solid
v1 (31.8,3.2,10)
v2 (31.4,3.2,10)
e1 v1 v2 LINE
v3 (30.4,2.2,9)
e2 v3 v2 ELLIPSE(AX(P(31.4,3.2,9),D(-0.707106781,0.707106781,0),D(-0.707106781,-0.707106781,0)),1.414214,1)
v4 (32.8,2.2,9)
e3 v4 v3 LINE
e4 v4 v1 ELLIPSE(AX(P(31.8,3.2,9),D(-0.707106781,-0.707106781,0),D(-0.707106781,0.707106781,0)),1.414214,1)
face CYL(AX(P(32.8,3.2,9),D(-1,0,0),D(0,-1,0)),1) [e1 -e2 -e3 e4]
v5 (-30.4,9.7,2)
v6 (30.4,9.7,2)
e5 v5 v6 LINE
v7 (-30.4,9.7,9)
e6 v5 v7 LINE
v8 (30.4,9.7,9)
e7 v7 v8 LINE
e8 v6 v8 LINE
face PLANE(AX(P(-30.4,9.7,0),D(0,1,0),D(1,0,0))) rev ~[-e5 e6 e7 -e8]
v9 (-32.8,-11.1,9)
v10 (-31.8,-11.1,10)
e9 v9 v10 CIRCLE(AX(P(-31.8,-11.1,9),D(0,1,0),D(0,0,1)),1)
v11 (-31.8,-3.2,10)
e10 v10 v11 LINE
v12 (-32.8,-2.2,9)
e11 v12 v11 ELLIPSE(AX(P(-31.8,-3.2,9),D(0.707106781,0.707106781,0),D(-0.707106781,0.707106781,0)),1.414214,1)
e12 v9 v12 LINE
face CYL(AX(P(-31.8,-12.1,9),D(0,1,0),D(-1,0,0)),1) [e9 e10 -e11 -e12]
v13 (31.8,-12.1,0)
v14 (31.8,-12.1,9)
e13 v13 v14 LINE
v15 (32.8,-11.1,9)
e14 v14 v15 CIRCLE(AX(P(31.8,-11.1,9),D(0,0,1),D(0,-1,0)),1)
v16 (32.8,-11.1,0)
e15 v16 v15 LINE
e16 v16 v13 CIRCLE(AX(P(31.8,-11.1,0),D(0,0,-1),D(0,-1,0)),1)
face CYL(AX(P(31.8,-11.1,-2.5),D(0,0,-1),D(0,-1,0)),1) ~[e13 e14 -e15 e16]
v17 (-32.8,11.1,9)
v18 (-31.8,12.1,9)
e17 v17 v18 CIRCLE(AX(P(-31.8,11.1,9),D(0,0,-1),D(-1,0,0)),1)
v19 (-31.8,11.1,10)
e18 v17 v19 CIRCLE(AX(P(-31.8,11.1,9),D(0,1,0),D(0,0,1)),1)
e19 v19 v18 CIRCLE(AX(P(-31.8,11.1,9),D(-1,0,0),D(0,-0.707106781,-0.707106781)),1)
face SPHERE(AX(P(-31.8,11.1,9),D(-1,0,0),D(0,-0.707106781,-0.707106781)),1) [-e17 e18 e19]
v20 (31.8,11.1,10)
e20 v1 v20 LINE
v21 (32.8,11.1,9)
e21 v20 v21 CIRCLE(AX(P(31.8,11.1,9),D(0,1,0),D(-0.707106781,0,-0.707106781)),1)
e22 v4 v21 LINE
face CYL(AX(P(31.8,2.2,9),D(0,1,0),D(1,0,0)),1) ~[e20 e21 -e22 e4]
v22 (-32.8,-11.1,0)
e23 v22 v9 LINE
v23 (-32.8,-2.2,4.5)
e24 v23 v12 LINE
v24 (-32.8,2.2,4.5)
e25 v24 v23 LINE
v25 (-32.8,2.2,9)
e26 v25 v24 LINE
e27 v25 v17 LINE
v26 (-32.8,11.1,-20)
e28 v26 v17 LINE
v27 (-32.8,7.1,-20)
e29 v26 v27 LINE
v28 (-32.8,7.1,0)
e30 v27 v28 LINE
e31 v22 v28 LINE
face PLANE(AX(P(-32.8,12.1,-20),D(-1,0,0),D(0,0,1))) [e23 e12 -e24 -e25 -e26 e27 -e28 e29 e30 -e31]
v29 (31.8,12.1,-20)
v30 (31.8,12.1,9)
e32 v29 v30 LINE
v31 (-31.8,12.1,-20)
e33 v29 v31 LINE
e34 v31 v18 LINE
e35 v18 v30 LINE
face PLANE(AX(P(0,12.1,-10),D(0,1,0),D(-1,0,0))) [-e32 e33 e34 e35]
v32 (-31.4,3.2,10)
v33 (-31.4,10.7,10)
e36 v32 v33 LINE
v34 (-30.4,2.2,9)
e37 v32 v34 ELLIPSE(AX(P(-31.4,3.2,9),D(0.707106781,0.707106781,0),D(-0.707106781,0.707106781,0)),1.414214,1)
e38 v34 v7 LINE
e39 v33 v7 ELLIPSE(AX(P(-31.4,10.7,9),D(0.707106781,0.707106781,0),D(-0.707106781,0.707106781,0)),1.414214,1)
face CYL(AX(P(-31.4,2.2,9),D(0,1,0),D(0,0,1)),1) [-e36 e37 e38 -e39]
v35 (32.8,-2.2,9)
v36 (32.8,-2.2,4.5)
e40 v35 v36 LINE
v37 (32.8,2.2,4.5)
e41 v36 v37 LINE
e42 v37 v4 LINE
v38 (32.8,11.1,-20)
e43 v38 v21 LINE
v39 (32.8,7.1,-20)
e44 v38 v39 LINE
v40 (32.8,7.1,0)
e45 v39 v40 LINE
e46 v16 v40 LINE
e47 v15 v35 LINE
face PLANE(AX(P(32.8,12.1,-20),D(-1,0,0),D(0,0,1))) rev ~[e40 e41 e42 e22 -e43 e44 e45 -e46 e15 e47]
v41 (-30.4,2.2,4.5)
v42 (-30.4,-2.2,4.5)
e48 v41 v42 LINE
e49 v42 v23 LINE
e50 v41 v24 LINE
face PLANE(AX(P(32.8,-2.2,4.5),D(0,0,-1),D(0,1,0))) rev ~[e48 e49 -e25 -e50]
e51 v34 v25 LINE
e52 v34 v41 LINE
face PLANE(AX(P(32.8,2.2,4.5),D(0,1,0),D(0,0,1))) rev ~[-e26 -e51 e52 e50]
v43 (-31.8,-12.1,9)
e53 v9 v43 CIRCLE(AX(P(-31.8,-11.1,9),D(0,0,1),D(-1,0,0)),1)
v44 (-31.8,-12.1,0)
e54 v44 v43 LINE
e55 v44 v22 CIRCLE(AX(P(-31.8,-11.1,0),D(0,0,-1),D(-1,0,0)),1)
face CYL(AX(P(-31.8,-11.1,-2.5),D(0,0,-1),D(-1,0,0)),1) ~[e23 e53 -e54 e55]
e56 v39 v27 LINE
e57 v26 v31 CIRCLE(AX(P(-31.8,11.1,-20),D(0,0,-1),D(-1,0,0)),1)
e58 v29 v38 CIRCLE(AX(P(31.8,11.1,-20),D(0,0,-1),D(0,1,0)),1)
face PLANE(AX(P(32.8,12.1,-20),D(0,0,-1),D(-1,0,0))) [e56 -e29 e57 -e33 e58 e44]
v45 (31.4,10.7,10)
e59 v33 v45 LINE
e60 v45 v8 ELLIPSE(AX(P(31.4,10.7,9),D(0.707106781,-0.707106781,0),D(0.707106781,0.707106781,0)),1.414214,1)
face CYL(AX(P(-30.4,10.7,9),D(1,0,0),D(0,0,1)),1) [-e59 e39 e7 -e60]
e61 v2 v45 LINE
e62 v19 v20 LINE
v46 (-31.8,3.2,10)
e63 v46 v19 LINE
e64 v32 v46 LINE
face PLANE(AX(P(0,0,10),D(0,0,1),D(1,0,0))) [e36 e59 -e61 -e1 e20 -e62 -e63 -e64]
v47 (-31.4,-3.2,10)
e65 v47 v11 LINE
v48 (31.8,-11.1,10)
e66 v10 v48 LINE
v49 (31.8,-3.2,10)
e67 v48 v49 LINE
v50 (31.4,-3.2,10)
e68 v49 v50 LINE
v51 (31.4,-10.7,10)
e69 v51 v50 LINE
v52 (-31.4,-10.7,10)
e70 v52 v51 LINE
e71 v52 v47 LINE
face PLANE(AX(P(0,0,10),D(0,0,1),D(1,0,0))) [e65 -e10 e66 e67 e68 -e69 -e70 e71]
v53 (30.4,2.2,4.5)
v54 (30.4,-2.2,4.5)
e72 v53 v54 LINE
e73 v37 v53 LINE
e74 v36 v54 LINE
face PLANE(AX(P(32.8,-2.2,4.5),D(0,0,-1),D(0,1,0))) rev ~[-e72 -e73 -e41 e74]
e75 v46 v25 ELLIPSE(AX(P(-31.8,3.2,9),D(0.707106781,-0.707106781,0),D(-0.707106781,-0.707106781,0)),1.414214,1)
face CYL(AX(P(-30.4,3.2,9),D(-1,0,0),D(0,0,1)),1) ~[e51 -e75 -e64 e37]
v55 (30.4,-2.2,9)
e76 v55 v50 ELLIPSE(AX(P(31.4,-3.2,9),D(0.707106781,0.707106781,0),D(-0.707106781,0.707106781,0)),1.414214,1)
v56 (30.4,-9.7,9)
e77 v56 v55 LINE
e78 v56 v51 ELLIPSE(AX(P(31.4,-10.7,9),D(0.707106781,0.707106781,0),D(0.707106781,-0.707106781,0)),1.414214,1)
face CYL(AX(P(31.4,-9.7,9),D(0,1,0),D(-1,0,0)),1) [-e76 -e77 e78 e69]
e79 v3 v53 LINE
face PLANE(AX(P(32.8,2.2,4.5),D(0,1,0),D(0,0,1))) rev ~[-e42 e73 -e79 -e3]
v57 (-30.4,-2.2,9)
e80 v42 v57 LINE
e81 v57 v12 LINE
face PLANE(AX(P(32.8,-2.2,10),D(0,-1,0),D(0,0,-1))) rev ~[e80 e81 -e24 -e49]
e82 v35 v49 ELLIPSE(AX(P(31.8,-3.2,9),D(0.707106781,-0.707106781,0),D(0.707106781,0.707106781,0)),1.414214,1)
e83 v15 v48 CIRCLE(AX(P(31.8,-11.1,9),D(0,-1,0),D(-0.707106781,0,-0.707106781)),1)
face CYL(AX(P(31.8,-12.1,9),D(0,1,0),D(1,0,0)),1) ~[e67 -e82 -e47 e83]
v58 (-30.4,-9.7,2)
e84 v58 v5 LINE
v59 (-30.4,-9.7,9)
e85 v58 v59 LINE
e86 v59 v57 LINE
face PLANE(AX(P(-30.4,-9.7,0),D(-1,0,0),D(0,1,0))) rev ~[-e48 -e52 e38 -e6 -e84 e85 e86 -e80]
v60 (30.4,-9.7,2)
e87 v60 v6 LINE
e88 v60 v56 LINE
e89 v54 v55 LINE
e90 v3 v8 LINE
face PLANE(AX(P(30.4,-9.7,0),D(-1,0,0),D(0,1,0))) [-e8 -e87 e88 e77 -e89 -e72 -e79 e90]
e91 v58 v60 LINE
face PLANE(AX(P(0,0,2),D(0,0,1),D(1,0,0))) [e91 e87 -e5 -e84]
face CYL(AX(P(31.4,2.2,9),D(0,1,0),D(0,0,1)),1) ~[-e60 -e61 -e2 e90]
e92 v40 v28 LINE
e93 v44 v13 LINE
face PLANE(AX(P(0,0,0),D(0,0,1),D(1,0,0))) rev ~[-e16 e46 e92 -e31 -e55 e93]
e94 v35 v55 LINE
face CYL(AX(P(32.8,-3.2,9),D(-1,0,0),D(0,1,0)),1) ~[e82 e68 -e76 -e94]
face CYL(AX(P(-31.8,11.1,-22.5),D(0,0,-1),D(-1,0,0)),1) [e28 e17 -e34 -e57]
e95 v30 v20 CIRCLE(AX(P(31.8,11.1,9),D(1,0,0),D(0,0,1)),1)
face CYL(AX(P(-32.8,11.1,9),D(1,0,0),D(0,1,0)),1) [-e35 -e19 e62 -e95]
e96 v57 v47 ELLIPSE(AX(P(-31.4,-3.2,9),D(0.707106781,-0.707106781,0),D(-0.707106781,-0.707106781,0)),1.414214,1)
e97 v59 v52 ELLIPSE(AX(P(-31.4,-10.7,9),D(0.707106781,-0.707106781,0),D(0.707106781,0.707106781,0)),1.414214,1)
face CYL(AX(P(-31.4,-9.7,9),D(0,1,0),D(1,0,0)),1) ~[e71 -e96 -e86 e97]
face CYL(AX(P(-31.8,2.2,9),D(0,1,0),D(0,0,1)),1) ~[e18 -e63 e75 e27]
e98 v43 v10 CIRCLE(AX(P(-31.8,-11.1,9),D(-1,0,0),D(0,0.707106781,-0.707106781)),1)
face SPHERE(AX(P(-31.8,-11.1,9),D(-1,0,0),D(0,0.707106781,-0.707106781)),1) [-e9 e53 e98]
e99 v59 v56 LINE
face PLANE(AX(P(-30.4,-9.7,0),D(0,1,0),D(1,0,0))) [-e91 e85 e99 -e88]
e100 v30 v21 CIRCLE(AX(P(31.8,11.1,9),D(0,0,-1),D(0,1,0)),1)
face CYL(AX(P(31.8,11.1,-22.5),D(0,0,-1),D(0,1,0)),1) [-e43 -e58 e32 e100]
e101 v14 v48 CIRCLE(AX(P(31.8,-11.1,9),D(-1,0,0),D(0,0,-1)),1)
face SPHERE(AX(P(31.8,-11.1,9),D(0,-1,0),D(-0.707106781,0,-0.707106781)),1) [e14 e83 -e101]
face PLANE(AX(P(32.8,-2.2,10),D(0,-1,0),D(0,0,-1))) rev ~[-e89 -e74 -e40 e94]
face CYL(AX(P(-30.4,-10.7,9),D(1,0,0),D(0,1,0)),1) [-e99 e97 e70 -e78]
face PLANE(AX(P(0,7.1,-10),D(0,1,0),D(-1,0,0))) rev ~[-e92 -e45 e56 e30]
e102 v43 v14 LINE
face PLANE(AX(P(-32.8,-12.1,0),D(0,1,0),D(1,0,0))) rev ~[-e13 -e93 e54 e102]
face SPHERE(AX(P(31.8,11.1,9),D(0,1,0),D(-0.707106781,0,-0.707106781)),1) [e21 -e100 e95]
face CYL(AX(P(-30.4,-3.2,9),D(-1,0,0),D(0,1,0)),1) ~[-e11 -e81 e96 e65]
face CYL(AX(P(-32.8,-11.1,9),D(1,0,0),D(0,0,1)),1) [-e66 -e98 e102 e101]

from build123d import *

# Parameters (mm, degrees)
F0_W         = 65.6
F0_H         = 24.2
F0_W_2       = 60.8
F0_H_2       = 19.4
F1_DEPTH     = 10
F2_DEPTH     = 2
F4_DEPTH     = 65.601
F5_W         = 65.6
F5_H         = 20
F6_DEPTH     = 5
F7_R         = 1
F8_R         = 1
F9_T1_DEPTH  = 31.5
F9_T3_DEPTH  = 11.5
F9_S7_W      = 1
F9_S7_H      = 1
F9_T8_DEPTH  = 1
F9_S13_W     = 1
F9_S13_H     = 1
F9_T14_DEPTH = 1
F9_S19_W     = 1
F9_S19_H     = 1
F9_T20_DEPTH = 1
F9_S25_W     = 1
F9_S25_H     = 1
F9_T26_DEPTH = 1


# Not quite as in the source:
# - a fillet or chamfer that OpenCascade refuses, or shapes differently, is made with other operations: its cross-section is extruded or revolved along the edge and cut away or added


with BuildPart() as f1:
    # F0 (on Top) → F1 (new body)
    with BuildSketch(Plane.XY):
        Rectangle(F0_W, F0_H)
        Rectangle(F0_W_2, F0_H_2, mode=Mode.SUBTRACT)
    extrude(amount=F1_DEPTH)

    # F0 (on Top) → F2 (join)
    with BuildSketch(Plane.XY):
        Rectangle(F0_W_2, F0_H_2)
    extrude(amount=F2_DEPTH)

    # F3 (on face) → F4 (cut, through all)
    with BuildSketch(Plane.YZ.offset(32.8)):
        Polygon((2.2, 10), (0, 10), (-2.2, 10), (-2.2, 4.5), (0, 4.5), (2.2, 4.5), align=None)
    extrude(amount=-F4_DEPTH, mode=Mode.SUBTRACT)

    # F5 (on face) → F6 (join)
    with BuildSketch(Plane(origin=(0, 12.1, 0), x_dir=(-1, 0, 0), z_dir=(0, 1, 0))):
        with Locations((0, -10)):
            Rectangle(F5_W, F5_H)
    extrude(amount=-F6_DEPTH)

    # F7
    f7_edges = [f1.edges().sort_by_distance(p)[0] for p in [
        (0, -9.7, 10),
        (0, -12.1, 10),
        (-32.8, -7.15, 10),
        (32.8, -7.15, 10),
        (30.4, -5.95, 10),
        (-31.6, -2.2, 10),
        (31.6, -2.2, 10),
        (-30.4, -5.95, 10),
    ]]
    fillet(f7_edges, radius=F7_R)

    # F8
    f8_edges = [f1.edges().sort_by_distance(p)[0] for p in [
        (-31.6, 2.2, 10),
        (31.6, 2.2, 10),
        (32.8, 7.15, 10),
        (-32.8, 7.15, 10),
        (-30.4, 5.95, 10),
        (30.4, 5.95, 10),
        (0, 9.7, 10),
        (0, 12.1, 10),
    ]]
    fillet(f8_edges, radius=F8_R)

    # F9: fillet of radius 1 on 4 edges, made by hand

    # F9_s2 → F9_t1 (cut)
    with BuildSketch(Plane.XY.offset(-22.5)):
        with BuildLine():
            ThreePointArc((31.8, 12.1), (32.5071067812, 11.8071067812), (32.8, 11.1))
            Line((32.8, 11.1), (32.8, 12.1))
            Line((32.8, 12.1), (31.8, 12.1))
        make_face()
        with BuildLine():
            ThreePointArc((-32.8, 11.1), (-32.5071067812, 11.8071067812), (-31.8, 12.1))
            Line((-31.8, 12.1), (-32.8, 12.1))
            Line((-32.8, 12.1), (-32.8, 11.1))
        make_face()
    extrude(amount=F9_T1_DEPTH, mode=Mode.SUBTRACT)

    # F9_s4 → F9_t3 (cut)
    with BuildSketch(Plane.XY.offset(-2.5)):
        with BuildLine():
            ThreePointArc((31.8, -12.1), (32.5071067812, -11.8071067812), (32.8, -11.1))
            Line((32.8, -11.1), (32.8, -12.1))
            Line((32.8, -12.1), (31.8, -12.1))
        make_face()
        with BuildLine():
            ThreePointArc((-32.8, -11.1), (-32.5071067812, -11.8071067812), (-31.8, -12.1))
            Line((-31.8, -12.1), (-32.8, -12.1))
            Line((-32.8, -12.1), (-32.8, -11.1))
        make_face()
    extrude(amount=F9_T3_DEPTH, mode=Mode.SUBTRACT)


with BuildPart() as f9_tool6:
    # F9_s7 → F9_t8 (new body)
    with BuildSketch(Plane.YZ.offset(-31.8)):
        with Locations((-11.6, 9.5)):
            Rectangle(F9_S7_W, F9_S7_H)
    extrude(amount=-F9_T8_DEPTH)

    # F9_s9 → F9_t10 (revolve, cut)
    with BuildSketch(Plane(origin=(-31.8, -11.1, 9), x_dir=(0, 0.7071067812, -0.7071067812), z_dir=(0, 0.7071067812, 0.7071067812))):
        with BuildLine():
            ThreePointArc((0, -1), (1, 0), (0, 1))
            Line((0, 1), (0, -1))
        make_face()
    revolve(axis=Axis((-31.8, -11.1, 9), (-1, 0, 0)), mode=Mode.SUBTRACT)


with BuildPart() as f1_1:
    add(f1.part)

    # F9_t5: cut F9_tool6
    add(f9_tool6.part, mode=Mode.SUBTRACT)


with BuildPart() as f9_tool12:
    # F9_s13 → F9_t14 (new body)
    with BuildSketch(Plane.YZ.offset(-31.8)):
        with Locations((11.6, 9.5)):
            Rectangle(F9_S13_W, F9_S13_H)
    extrude(amount=-F9_T14_DEPTH)

    # F9_s15 → F9_t16 (revolve, cut)
    with BuildSketch(Plane(origin=(-31.8, 11.1, 9), x_dir=(0, -0.7071067812, -0.7071067812), z_dir=(0, 0.7071067812, -0.7071067812))):
        with BuildLine():
            ThreePointArc((0, -1), (1, 0), (0, 1))
            Line((0, 1), (0, -1))
        make_face()
    revolve(axis=Axis((-31.8, 11.1, 9), (-1, 0, 0)), mode=Mode.SUBTRACT)


with BuildPart() as f1_2:
    add(f1_1.part)

    # F9_t11: cut F9_tool12
    add(f9_tool12.part, mode=Mode.SUBTRACT)


with BuildPart() as f9_tool18:
    # F9_s19 → F9_t20 (new body)
    with BuildSketch(Plane.XZ.offset(11.1)):
        with Locations((32.3, 9.5)):
            Rectangle(F9_S19_W, F9_S19_H)
    extrude(amount=F9_T20_DEPTH)

    # F9_s21 → F9_t22 (revolve, cut)
    with BuildSketch(Plane(origin=(31.8, -11.1, 9), x_dir=(-0.7071067812, 0, -0.7071067812), z_dir=(-0.7071067812, 0, 0.7071067812))):
        with BuildLine():
            ThreePointArc((0, -1), (1, 0), (0, 1))
            Line((0, 1), (0, -1))
        make_face()
    revolve(axis=Axis((31.8, -11.1, 9), (0, -1, 0)), mode=Mode.SUBTRACT)


with BuildPart() as f1_3:
    add(f1_2.part)

    # F9_t17: cut F9_tool18
    add(f9_tool18.part, mode=Mode.SUBTRACT)


with BuildPart() as f9_tool24:
    # F9_s25 → F9_t26 (new body)
    with BuildSketch(Plane.XZ.offset(-11.1)):
        with Locations((32.3, 9.5)):
            Rectangle(F9_S25_W, F9_S25_H)
    extrude(amount=-F9_T26_DEPTH)

    # F9_s27 → F9_t28 (revolve, cut)
    with BuildSketch(Plane(origin=(31.8, 11.1, 9), x_dir=(-0.7071067812, 0, -0.7071067812), z_dir=(0.7071067812, 0, -0.7071067812))):
        with BuildLine():
            ThreePointArc((0, -1), (1, 0), (0, 1))
            Line((0, 1), (0, -1))
        make_face()
    revolve(axis=Axis((31.8, 11.1, 9), (0, 1, 0)), mode=Mode.SUBTRACT)


with BuildPart() as f1_4:
    add(f1_3.part)

    # F9_t23: cut F9_tool24
    add(f9_tool24.part, mode=Mode.SUBTRACT)


solid = f1_4.part
